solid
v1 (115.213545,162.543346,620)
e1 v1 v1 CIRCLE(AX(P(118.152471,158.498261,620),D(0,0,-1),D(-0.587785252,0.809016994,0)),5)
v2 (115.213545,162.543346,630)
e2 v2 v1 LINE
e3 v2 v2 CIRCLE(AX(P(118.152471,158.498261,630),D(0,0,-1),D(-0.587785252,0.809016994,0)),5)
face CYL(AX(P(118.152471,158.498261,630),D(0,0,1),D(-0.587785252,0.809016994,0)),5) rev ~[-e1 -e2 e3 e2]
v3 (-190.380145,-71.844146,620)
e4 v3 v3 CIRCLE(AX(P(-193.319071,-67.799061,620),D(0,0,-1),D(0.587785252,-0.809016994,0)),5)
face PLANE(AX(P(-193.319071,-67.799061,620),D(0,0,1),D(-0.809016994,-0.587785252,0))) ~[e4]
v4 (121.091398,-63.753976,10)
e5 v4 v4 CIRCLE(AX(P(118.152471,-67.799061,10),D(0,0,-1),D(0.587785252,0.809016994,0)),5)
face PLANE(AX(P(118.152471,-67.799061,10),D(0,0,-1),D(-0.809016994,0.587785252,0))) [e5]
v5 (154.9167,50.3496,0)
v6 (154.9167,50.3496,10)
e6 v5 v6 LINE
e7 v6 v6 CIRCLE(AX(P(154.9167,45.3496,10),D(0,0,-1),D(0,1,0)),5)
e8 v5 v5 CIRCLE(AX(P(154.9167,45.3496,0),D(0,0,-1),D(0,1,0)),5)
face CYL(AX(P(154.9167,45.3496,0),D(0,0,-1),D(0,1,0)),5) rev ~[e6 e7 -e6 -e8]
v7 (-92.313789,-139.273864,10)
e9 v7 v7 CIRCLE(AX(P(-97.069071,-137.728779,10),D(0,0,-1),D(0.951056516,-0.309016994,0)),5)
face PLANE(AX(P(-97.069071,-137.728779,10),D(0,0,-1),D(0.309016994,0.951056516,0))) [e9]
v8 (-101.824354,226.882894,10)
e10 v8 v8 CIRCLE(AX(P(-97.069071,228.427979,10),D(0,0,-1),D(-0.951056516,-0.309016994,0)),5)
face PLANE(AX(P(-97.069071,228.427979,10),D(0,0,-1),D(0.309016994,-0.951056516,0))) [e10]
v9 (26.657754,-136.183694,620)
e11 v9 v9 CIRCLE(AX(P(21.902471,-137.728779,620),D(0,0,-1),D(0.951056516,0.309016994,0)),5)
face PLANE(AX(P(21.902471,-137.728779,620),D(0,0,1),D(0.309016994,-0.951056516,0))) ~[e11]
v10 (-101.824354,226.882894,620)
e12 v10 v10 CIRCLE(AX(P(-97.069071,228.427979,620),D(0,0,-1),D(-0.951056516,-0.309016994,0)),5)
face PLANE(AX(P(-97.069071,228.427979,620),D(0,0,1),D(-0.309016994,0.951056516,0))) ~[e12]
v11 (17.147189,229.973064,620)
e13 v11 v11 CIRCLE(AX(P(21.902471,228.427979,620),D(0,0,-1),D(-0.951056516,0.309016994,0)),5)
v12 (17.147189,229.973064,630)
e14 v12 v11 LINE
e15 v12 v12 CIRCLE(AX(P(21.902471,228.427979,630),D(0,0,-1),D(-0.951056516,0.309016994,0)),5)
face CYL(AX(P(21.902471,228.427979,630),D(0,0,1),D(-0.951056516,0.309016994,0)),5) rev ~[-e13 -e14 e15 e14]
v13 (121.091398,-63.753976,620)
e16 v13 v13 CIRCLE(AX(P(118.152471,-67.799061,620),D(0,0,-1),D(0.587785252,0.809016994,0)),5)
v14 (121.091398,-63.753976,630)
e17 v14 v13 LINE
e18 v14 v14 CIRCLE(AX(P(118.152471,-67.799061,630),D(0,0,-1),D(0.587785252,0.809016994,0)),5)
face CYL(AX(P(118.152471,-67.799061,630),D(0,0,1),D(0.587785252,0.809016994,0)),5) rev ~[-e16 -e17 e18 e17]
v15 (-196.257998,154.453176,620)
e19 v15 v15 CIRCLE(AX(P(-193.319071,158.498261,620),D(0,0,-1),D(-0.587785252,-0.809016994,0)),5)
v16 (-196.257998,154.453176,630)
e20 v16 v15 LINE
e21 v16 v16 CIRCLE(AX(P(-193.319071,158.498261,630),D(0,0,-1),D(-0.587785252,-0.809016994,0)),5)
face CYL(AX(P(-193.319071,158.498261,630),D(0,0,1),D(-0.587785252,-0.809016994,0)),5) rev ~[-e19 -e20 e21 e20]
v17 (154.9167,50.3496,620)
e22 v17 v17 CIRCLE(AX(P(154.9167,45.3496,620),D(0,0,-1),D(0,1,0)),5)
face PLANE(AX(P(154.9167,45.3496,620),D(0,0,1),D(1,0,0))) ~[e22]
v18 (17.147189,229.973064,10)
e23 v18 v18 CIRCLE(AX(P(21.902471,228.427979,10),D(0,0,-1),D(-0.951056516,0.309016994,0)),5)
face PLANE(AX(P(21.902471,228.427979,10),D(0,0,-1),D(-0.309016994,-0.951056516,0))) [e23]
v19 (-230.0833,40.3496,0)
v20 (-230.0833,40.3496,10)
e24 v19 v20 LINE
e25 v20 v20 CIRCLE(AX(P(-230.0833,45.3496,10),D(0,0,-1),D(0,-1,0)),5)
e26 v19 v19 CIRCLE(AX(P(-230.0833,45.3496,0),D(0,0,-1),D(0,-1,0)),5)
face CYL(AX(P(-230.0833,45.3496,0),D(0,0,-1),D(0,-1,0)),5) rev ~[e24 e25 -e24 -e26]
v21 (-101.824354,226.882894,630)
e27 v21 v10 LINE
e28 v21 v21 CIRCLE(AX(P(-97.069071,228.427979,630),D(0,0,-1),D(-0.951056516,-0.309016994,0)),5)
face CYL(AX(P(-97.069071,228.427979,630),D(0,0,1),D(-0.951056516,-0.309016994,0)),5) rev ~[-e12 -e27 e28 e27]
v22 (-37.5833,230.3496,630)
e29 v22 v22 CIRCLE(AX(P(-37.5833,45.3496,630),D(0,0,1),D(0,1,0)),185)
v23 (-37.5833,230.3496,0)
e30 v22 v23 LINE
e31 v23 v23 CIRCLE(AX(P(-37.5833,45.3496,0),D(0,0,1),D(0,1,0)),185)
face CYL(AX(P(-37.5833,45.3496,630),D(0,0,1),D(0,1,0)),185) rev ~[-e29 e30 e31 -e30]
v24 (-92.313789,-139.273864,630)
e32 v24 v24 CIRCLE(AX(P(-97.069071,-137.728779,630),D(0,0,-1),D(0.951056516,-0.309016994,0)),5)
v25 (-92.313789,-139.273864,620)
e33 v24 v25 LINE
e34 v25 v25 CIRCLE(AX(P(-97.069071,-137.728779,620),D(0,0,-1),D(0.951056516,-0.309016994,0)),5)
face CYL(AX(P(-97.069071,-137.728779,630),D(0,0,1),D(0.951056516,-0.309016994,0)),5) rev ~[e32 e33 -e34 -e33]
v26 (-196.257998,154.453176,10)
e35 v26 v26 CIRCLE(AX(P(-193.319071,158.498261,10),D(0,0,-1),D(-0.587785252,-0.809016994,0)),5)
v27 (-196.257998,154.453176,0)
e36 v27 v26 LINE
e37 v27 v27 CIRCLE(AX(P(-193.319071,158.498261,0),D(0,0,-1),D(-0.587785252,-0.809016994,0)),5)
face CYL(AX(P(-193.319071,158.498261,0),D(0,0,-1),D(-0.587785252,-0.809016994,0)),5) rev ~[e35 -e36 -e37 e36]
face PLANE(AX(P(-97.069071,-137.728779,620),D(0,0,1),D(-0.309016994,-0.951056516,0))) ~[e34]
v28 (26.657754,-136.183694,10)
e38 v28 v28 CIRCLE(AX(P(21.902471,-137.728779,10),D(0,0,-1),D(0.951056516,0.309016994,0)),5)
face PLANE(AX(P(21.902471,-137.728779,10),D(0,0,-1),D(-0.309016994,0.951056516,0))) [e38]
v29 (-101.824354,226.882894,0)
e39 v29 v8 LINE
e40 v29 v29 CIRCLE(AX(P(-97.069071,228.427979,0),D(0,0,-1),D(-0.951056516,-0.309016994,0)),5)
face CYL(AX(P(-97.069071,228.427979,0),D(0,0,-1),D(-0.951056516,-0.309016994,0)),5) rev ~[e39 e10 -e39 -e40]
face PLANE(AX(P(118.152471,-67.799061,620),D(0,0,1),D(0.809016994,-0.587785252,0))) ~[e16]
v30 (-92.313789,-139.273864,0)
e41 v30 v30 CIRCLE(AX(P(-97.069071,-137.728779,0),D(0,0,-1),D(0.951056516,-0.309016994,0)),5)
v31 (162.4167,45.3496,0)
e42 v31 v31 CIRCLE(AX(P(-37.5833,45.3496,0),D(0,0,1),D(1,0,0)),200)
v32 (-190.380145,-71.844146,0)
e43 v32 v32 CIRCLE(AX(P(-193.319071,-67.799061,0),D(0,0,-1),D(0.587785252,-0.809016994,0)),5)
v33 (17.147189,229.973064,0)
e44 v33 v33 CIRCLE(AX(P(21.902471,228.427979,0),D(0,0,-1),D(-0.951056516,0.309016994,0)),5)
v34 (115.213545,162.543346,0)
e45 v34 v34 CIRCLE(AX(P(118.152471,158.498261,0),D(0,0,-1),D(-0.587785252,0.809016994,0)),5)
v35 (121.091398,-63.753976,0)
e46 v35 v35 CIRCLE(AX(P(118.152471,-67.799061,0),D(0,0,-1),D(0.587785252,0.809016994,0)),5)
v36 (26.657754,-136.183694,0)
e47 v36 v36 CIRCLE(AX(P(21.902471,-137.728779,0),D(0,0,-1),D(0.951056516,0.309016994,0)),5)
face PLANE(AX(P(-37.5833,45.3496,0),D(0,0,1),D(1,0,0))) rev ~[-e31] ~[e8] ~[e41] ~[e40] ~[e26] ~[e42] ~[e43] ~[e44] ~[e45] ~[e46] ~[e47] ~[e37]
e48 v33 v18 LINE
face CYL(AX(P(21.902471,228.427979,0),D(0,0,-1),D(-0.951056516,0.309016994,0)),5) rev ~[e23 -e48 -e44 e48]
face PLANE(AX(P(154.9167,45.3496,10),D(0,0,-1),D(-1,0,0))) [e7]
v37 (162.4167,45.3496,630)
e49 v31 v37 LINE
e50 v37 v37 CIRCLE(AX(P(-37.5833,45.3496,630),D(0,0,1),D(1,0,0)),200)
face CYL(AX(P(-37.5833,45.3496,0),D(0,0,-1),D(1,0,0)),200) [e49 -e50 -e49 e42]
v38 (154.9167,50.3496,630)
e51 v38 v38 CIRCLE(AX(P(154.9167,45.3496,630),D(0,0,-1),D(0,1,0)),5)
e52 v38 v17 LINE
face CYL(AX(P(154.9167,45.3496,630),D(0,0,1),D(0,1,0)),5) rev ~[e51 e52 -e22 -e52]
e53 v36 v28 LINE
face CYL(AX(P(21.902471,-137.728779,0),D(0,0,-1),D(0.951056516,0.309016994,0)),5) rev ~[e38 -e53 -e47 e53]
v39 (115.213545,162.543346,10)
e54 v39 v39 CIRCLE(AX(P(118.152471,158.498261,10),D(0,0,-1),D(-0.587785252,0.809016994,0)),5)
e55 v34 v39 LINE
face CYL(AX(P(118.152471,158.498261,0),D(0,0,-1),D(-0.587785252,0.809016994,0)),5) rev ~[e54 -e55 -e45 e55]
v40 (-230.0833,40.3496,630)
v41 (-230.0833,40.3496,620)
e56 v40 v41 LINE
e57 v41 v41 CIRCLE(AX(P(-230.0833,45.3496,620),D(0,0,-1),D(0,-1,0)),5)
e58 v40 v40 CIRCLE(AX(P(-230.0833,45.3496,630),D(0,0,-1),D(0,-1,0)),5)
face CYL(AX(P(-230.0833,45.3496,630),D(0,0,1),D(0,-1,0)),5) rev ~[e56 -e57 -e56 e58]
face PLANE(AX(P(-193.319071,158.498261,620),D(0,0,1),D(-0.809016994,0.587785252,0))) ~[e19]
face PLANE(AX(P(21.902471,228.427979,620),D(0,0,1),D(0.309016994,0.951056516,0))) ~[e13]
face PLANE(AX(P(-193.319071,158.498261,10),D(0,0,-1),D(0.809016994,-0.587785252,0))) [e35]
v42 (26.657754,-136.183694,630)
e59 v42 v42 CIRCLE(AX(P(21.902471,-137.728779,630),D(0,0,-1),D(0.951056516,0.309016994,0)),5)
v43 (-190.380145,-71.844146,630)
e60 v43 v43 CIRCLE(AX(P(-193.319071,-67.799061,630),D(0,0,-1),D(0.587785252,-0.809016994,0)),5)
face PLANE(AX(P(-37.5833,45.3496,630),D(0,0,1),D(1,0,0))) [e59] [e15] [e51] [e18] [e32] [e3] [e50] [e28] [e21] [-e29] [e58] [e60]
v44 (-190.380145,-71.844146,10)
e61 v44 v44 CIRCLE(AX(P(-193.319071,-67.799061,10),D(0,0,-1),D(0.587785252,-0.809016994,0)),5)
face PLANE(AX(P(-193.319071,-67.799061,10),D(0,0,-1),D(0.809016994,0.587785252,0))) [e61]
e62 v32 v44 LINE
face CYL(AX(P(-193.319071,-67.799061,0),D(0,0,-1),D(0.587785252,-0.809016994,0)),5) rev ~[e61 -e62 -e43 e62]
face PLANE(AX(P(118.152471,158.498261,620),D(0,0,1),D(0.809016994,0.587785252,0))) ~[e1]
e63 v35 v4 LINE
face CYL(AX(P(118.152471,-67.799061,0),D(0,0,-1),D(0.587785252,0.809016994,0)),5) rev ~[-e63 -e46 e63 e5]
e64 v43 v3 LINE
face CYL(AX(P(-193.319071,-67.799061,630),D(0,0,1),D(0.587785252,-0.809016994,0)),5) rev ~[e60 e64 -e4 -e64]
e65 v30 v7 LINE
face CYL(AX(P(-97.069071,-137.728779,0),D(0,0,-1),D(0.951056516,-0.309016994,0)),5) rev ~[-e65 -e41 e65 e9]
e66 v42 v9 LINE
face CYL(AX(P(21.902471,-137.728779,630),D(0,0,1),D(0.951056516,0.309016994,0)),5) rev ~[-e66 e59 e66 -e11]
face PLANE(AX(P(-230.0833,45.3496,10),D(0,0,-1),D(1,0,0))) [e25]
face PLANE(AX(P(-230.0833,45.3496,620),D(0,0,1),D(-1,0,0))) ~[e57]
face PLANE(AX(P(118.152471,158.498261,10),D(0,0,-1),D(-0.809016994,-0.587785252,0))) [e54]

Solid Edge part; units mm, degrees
sketch "Sketch1" plane through (0, 0, 0) normal (0, 0, 1) x (1, 0, 0)
  circle A0 centre (-37.5833, 45.3496) radius 200
extrude "Protrusion1" add sketch "Sketch1" along normal blind 630
sketch "Sketch2" plane through (-37.5833, 45.3496, -30) normal (0, 0, -1) x (0, -1, 0)
  circle A0 centre (0, 0) radius 25
  dimension "D1" = 50
extrude "Cutout1" cut sketch "Sketch2" against normal through all
sketch "Sketch3" plane through (-37.5833, 45.3496, 630) normal (0, 0, 1) x (0, 1, 0)
  circle A0 centre (0, 0) radius 185
  dimension "D1" = 370
extrude "Cutout2" cut sketch "Sketch3" against normal through all
sketch "Sketch4" plane through (-37.5833, 45.3496, 0) normal (0, 0, -1) x (0, 1, 0)
  circle A0 centre (0, 192.5) radius 5
  dimension "D1" = 10
  dimension "D2" = 7.5
extrude "ExtrudedCutout_4" cut sketch "Sketch4" against normal blind 10
pattern_circular "Pattern1" count 10 over 360 about axis through (-37.5833, 45.3496, 0) along (0, 0, 1) of "ExtrudedCutout_4"
mirror "Mirror1" about plane through (-37.5833, 45.3496, 315) normal (0, 0, 1) of "ExtrudedCutout_4", "Pattern1"
properties material "Aluminum, 6061-T6"
